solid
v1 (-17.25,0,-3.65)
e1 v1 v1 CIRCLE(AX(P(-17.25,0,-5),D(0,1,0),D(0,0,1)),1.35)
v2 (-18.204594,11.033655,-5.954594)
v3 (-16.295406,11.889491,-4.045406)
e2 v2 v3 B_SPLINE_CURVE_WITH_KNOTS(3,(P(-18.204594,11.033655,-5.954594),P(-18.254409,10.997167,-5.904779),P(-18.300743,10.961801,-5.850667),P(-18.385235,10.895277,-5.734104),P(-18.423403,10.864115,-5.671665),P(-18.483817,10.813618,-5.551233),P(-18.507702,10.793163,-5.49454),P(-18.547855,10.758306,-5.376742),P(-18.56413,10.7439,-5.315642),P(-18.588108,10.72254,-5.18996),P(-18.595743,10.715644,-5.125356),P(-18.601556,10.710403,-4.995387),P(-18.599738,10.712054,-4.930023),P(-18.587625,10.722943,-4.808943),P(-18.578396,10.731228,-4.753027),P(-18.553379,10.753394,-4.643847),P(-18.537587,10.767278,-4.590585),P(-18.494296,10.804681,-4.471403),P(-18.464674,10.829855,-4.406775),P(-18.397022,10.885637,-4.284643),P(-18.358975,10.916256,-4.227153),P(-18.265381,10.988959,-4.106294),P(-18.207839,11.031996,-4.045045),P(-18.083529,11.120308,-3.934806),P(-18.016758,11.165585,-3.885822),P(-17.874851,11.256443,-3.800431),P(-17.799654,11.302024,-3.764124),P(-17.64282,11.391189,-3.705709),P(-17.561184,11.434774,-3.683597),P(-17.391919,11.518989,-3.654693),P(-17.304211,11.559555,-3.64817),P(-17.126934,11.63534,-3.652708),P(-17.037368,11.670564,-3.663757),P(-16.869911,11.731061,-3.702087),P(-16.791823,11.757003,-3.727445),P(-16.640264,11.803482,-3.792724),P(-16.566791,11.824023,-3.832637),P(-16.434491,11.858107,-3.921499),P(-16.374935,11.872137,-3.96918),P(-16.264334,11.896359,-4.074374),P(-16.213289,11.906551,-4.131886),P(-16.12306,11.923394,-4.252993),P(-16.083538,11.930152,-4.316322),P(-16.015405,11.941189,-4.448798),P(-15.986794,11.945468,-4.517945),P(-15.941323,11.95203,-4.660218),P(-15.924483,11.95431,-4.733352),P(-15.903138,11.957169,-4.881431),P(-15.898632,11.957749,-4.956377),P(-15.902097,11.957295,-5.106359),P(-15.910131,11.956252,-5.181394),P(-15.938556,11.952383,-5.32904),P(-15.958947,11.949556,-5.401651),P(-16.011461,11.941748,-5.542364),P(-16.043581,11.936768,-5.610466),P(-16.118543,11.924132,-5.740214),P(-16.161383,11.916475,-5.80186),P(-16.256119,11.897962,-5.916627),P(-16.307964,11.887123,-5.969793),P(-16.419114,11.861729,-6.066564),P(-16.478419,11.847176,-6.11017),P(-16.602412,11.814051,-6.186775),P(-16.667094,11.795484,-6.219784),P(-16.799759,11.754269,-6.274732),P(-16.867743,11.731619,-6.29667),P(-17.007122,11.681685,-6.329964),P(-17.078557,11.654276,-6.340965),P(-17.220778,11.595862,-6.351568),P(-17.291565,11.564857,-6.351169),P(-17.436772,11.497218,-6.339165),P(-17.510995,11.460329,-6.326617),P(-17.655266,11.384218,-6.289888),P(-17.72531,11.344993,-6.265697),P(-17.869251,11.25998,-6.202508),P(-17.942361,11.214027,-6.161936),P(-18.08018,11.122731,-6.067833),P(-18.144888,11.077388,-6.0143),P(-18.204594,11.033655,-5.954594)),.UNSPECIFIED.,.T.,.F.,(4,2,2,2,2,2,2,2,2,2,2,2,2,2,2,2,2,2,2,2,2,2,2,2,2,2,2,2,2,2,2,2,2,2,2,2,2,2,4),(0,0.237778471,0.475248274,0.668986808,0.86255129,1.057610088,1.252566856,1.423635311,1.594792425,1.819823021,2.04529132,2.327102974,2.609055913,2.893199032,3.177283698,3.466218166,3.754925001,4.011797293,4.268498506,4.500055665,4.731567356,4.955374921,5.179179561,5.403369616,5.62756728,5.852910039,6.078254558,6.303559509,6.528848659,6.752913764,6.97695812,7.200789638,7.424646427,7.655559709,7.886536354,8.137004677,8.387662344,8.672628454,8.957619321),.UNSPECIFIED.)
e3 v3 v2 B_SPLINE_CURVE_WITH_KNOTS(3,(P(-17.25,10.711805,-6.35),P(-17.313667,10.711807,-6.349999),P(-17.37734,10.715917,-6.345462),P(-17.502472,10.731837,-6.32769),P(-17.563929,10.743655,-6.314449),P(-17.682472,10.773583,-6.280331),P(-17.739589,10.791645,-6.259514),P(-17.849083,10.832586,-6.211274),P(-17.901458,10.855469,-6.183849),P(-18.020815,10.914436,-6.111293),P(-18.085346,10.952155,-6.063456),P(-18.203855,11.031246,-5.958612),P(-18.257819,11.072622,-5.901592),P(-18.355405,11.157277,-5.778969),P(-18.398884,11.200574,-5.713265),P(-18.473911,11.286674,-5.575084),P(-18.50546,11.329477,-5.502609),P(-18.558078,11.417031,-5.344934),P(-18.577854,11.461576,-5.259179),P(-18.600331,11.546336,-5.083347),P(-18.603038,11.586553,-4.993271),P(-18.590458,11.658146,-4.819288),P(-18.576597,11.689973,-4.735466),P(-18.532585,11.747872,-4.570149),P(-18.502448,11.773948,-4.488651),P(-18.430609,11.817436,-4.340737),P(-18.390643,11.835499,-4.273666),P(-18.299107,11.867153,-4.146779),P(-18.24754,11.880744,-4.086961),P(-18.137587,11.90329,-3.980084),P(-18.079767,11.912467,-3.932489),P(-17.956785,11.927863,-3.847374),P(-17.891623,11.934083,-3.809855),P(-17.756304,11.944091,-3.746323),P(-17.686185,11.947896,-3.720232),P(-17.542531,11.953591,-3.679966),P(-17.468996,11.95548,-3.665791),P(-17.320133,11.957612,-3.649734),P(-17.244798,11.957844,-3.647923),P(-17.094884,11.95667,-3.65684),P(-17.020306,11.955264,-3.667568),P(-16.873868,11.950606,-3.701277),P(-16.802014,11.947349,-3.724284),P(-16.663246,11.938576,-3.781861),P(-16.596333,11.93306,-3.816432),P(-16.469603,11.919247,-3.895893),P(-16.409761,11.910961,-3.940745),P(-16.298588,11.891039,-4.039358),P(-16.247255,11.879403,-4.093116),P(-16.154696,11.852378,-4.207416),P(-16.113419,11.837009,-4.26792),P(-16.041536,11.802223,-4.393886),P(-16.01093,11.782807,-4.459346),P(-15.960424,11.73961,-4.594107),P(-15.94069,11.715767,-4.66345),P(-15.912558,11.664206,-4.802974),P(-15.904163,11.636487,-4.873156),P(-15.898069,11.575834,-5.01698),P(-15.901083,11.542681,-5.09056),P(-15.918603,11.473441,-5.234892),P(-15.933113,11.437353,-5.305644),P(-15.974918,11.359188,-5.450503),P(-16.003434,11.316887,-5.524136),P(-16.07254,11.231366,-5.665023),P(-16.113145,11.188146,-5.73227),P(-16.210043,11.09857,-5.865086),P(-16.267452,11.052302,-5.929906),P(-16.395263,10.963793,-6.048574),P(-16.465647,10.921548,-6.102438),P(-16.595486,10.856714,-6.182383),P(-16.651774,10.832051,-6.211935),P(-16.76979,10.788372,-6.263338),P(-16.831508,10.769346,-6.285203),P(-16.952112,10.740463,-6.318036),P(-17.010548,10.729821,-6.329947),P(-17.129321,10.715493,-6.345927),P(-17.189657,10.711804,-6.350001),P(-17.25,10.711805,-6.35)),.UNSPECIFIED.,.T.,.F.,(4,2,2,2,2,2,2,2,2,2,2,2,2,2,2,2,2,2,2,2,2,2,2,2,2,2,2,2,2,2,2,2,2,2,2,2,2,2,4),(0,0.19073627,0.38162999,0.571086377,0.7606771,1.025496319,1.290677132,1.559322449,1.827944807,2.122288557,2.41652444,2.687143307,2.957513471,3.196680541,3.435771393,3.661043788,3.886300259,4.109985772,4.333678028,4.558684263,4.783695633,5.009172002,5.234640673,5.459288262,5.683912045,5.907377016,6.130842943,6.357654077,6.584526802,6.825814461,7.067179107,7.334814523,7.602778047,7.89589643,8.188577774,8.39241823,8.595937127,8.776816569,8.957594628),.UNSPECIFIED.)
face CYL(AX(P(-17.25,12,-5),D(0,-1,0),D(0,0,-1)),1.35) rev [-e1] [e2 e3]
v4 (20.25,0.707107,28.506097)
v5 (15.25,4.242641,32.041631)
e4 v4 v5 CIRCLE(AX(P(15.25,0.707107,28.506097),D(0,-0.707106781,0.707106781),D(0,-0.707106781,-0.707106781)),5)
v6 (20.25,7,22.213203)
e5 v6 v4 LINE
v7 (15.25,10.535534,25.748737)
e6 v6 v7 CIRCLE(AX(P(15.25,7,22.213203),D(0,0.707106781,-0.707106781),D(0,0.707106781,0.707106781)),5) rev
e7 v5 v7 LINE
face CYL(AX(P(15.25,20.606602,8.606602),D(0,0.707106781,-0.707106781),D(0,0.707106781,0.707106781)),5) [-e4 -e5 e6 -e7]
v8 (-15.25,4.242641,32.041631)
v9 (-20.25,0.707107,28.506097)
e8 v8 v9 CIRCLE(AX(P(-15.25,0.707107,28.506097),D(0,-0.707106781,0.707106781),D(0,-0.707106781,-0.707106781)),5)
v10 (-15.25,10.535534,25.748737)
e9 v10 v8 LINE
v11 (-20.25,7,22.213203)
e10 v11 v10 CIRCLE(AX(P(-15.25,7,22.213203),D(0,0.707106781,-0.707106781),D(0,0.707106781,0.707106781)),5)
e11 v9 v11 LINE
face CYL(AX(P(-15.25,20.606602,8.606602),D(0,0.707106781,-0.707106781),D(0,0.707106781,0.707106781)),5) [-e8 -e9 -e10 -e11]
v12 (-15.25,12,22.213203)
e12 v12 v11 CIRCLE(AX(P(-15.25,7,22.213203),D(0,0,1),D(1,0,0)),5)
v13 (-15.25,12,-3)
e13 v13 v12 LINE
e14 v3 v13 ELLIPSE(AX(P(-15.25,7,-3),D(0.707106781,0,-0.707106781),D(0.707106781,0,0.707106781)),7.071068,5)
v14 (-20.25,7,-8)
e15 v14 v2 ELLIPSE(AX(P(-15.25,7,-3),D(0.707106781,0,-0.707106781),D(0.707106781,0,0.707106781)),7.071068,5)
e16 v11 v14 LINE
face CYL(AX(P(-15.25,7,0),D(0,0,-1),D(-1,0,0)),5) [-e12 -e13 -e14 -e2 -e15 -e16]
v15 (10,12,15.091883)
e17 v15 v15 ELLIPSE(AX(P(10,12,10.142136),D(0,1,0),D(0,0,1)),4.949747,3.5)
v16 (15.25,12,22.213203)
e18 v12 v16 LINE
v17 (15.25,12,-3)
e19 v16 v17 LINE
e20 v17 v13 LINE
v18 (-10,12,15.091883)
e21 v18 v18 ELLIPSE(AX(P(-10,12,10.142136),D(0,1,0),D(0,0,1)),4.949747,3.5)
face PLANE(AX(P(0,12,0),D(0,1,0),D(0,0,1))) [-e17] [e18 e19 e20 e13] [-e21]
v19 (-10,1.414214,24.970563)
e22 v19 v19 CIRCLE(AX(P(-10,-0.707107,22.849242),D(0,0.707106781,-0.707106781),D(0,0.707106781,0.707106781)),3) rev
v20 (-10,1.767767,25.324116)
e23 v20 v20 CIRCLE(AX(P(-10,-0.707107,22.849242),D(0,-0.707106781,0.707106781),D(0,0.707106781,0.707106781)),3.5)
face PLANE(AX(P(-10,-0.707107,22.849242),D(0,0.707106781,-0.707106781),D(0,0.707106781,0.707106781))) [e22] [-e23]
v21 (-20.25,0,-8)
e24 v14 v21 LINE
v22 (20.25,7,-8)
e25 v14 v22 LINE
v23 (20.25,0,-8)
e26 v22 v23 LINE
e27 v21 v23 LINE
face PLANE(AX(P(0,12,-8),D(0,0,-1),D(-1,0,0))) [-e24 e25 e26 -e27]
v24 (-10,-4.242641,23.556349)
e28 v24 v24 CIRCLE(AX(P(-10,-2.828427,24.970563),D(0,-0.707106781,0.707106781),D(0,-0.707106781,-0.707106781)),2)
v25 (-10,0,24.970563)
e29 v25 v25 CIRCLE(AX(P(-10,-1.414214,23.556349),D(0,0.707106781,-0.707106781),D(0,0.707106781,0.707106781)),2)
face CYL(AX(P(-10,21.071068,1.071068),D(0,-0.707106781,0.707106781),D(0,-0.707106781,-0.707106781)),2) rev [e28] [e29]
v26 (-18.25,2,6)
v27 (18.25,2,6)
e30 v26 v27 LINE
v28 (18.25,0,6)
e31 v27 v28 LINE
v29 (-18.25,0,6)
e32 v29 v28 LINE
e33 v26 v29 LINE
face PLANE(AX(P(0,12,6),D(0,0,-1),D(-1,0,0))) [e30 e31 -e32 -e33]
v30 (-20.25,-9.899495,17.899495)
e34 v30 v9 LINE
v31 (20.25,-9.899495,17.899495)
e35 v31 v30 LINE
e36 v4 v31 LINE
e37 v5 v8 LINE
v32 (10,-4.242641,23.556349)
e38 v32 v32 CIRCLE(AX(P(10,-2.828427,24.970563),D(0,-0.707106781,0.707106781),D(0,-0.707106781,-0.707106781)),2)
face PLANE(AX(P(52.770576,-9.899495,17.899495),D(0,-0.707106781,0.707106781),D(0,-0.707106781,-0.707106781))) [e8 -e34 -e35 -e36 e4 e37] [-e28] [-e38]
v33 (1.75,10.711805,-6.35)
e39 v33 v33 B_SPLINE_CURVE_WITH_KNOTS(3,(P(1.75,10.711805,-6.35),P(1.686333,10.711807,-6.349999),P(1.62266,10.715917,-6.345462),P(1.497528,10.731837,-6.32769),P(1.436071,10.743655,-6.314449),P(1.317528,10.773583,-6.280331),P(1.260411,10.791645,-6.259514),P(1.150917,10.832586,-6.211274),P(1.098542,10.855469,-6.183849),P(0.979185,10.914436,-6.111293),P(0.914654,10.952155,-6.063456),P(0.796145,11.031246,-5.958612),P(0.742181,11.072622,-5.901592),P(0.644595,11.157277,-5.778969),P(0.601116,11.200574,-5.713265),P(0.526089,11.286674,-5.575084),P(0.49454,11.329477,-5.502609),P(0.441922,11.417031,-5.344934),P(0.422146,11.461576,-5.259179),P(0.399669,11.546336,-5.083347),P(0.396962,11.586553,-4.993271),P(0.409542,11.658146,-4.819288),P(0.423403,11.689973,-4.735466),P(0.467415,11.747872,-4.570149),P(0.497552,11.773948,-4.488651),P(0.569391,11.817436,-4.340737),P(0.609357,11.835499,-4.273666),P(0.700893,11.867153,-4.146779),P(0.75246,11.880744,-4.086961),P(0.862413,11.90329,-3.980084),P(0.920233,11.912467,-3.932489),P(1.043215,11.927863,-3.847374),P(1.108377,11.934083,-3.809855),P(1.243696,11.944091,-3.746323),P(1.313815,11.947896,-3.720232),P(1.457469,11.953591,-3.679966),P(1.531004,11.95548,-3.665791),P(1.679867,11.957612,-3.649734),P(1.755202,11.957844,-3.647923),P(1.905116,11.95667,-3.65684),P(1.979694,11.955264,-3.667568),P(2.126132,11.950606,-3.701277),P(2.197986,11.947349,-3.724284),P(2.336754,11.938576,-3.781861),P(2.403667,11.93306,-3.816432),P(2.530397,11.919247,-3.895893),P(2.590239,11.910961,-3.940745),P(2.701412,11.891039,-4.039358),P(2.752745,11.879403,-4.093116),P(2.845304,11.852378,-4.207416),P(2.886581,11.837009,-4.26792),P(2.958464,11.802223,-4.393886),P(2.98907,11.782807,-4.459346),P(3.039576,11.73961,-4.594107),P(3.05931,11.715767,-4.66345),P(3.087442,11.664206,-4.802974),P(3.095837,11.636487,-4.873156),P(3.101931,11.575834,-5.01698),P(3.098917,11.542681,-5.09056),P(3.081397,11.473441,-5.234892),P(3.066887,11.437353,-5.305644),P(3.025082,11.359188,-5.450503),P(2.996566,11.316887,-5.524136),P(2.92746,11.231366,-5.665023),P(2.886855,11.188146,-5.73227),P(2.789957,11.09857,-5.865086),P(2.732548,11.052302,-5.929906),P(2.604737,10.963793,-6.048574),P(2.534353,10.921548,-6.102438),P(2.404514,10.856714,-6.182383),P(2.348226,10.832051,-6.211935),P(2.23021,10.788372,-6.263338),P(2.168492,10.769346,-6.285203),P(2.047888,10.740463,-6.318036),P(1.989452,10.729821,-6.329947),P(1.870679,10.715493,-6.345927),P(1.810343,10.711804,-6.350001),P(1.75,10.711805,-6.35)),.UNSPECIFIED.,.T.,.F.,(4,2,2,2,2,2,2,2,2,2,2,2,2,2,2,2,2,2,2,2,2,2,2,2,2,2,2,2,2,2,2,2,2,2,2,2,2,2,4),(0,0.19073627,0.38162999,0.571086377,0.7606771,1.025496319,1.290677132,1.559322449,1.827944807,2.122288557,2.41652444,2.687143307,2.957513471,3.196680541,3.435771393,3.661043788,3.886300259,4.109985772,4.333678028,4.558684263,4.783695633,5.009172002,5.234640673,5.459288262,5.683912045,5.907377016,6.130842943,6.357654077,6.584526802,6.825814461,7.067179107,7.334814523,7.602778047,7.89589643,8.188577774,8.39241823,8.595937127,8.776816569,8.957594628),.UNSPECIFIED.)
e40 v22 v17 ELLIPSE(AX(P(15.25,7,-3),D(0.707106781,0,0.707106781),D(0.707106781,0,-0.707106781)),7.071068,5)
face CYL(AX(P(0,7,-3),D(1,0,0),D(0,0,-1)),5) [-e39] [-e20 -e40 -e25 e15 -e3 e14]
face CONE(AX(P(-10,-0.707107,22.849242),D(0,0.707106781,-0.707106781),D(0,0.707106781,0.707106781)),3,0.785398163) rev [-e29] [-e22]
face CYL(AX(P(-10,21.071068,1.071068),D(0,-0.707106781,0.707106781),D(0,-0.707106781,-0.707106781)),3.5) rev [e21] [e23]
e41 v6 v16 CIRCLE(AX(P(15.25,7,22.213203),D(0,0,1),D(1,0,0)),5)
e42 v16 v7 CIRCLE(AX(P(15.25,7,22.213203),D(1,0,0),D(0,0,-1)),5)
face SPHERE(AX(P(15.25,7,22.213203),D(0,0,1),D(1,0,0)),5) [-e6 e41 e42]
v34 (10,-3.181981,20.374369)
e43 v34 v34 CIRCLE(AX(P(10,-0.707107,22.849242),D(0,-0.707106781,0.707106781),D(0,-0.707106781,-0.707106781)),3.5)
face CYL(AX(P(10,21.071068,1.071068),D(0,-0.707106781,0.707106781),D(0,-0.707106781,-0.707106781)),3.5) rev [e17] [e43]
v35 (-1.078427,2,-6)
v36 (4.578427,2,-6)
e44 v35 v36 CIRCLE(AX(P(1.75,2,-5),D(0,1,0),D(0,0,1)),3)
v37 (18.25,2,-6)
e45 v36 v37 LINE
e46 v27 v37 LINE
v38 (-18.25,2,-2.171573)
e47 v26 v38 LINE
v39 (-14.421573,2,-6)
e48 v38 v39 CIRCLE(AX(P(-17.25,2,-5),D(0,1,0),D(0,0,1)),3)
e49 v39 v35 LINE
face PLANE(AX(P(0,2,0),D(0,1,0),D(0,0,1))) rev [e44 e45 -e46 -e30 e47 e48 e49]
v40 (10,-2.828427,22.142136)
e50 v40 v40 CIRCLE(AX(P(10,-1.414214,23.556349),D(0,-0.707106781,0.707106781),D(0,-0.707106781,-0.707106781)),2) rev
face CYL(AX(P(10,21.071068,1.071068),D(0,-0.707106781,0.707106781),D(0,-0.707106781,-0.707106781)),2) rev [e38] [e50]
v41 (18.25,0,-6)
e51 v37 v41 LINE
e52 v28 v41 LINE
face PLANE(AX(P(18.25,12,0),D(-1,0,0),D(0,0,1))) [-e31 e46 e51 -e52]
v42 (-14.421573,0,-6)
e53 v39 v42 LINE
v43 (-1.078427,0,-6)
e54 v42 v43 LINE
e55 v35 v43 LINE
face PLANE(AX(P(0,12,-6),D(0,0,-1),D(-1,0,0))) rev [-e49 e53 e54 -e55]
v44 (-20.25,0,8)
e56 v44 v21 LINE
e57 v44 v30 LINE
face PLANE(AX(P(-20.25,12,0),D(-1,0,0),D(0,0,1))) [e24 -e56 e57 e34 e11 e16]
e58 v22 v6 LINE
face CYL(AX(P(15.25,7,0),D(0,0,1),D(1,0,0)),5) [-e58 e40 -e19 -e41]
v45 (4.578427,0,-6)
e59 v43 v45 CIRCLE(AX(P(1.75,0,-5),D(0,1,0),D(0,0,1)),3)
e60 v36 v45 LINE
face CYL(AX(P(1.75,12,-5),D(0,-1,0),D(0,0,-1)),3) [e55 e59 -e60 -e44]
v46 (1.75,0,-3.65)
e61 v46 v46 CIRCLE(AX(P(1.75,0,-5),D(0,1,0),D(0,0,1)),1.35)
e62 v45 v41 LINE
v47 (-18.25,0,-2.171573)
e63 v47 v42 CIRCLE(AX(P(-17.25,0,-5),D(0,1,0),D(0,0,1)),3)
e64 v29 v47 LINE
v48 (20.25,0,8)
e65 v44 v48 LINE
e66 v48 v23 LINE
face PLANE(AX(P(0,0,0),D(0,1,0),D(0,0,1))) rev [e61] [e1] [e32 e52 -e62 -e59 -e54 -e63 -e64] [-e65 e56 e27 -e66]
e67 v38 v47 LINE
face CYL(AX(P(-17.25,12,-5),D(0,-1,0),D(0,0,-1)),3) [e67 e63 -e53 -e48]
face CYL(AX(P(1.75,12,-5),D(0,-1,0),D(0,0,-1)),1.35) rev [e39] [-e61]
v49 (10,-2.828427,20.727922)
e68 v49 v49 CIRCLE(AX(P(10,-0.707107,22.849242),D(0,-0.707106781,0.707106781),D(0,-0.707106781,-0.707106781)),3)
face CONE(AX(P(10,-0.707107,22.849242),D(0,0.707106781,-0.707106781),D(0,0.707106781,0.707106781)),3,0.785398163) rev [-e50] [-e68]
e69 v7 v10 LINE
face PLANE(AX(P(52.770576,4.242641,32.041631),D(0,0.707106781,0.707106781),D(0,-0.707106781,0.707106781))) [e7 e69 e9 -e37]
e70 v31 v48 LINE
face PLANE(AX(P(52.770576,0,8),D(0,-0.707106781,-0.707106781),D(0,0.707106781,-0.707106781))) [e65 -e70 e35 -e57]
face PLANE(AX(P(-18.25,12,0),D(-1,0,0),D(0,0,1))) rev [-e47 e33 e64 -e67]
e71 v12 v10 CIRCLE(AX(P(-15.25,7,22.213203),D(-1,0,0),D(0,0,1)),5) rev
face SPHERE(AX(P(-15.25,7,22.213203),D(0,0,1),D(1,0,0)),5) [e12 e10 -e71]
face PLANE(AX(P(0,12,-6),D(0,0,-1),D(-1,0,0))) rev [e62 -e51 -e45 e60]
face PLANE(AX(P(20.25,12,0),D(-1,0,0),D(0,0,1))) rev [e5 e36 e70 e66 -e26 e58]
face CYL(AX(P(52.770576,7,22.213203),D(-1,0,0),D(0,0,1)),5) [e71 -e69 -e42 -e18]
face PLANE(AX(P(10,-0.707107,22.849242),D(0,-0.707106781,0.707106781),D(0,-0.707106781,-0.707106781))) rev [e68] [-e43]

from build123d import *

# Parameters (mm, degrees)
SKETCH1_W           = 40.5
SKETCH1_H           = 16
SKETCH1_R           = 1.35
BOSS_EXTRUDE1_DEPTH = 12
BOSS_EXTRUDE2_START = 2
BOSS_EXTRUDE2_DEPTH = 10
BOSS_EXTRUDE3_DEPTH = 40.5
SKETCH4_R           = 2
CUT_EXTRUDE3_DEPTH  = 40.502331785
CUT_EXTRUDE4_START  = -3
SKETCH4_5_R         = 3.5
SKETCH4_5_R_2       = 2
CUT_EXTRUDE4_DEPTH  = 37.502331785
CHAMFER2_SIZE       = 1
FILLET2_R           = 5


with BuildPart() as part:
    # Sketch1 → Boss-Extrude1 (new body)
    with BuildSketch(Plane(origin=(0, 0, 0), x_dir=(1, 0, 0), z_dir=(0, 1, 0))):
        Rectangle(SKETCH1_W, SKETCH1_H)
        with Locations(Location((-17.25, 5, 0), (0, 0, 270))):
            Circle(SKETCH1_R, mode=Mode.SUBTRACT)
        with BuildLine():
            Line((-14.421572875, 6), (-1.078427125, 6))
            ThreePointArc((-1.078427125, 6), (1.75, 2), (4.578427125, 6))
            Line((4.578427125, 6), (18.25, 6))
            Line((18.25, 6), (18.25, -6))
            Line((18.25, -6), (-18.25, -6))
            Line((-18.25, -6), (-18.25, 2.171572875))
            ThreePointArc((-18.25, 2.171572875), (-15.128679656, 2.878679656), (-14.421572875, 6))
        make_face(mode=Mode.SUBTRACT)
        with Locations(Location((1.75, 5, 0), (0, 0, 270))):
            Circle(SKETCH1_R, mode=Mode.SUBTRACT)
    extrude(amount=BOSS_EXTRUDE1_DEPTH)

    # Sketch1<3> → Boss-Extrude2 (add)
    with BuildSketch(Plane(origin=(0, 0, 0), x_dir=(1, 0, 0), z_dir=(0, 1, 0)).offset(BOSS_EXTRUDE2_START)):
        with BuildLine():
            ThreePointArc((-14.25, 5), (-15.517949192, 2.550510257), (-18.25, 2.171572875))
            Line((-18.25, 2.171572875), (-18.25, -6))
            Line((-18.25, -6), (18.25, -6))
            Line((18.25, -6), (18.25, 6))
            Line((18.25, 6), (4.578427125, 6))
            ThreePointArc((4.578427125, 6), (4.706795679, 5.507305936), (4.75, 5))
            ThreePointArc((4.75, 5), (1.242694064, 2.043204321), (-1.078427125, 6))
            Line((-1.078427125, 6), (-14.421572875, 6))
            ThreePointArc((-14.421572875, 6), (-14.293204321, 5.507305936), (-14.25, 5))
        make_face()
    extrude(amount=BOSS_EXTRUDE2_DEPTH)

    # Sketch3 → Boss-Extrude3 (add)
    with BuildSketch(Plane.ZY.offset(20.25)):
        Polygon((8, 0), (17.899494937, -9.899494937), (32.04163056, 4.242640687), (24.284271247, 12), (8, 12), align=None)
    extrude(amount=-BOSS_EXTRUDE3_DEPTH)

    # Sketch4 → Cut-Extrude3 (cut, through all)
    with BuildSketch(Plane(origin=(0, -13.899494937, 13.899494937), x_dir=(1, 0, 0), z_dir=(0, -0.7071067811865437, 0.7071067811865513))):
        with Locations(Location((-10, 15.656854249, 0), (0, 0, 270))):
            Circle(SKETCH4_R)
        with Locations(Location((10, 15.656854249, 0), (0, 0, 270))):
            Circle(SKETCH4_R)
    extrude(amount=-CUT_EXTRUDE3_DEPTH, mode=Mode.SUBTRACT)

    # Sketch4<5> → Cut-Extrude4 (cut, through all)
    # profile 1 of 2: a face of its own
    with BuildSketch(Plane(origin=(0, -13.899494937, 13.899494937), x_dir=(1, 0, 0), z_dir=(0, -0.7071067811865437, 0.7071067811865513)).offset(CUT_EXTRUDE4_START)):
        with Locations(Location((10, 15.656854249, 0), (0, 0, 270))):
            Circle(SKETCH4_5_R)
        with Locations(Location((10, 15.656854249, 0), (0, 0, 270))):
            Circle(SKETCH4_5_R_2, mode=Mode.SUBTRACT)
    # profile 2 of 2: a face of its own
    with BuildSketch(Plane(origin=(0, -13.899494937, 13.899494937), x_dir=(1, 0, 0), z_dir=(0, -0.7071067811865437, 0.7071067811865513)).offset(CUT_EXTRUDE4_START)):
        with Locations(Location((-10, 15.656854249, 0), (0, 0, 90))):
            Circle(SKETCH4_5_R)
        with Locations(Location((-10, 15.656854249, 0), (0, 0, 270))):
            Circle(SKETCH4_5_R_2, mode=Mode.SUBTRACT)
    extrude(amount=-CUT_EXTRUDE4_DEPTH, mode=Mode.SUBTRACT)

    # Chamfer2
    chamfer2_edges = [part.edges().sort_by_distance(p)[0] for p in [
        (-10, 0.707106781, 24.263455967),
        (10, 0.707106781, 24.263455967),
    ]]
    chamfer(chamfer2_edges, length=CHAMFER2_SIZE)

    # Fillet2
    # the kernel refuses this fillet: 5 mm, written as the material it takes off along each edge
    with BuildSketch(Plane(origin=(15.25, 7, 22.213203436), x_dir=(0, 0.7071067811865516, 0.7071067811865435), z_dir=(1, 0, 0))) as fillet2_piece_1_section:
        Polygon((0, 0), (FILLET2_R, 0), (FILLET2_R, -FILLET2_R * 0.414213562373), (FILLET2_R * 0.707106781187, -FILLET2_R * 0.707106781187), align=None)
    fillet2_piece_1 = extrude(amount=FILLET2_R, mode=Mode.PRIVATE)
    fillet2_piece_1 = fillet2_piece_1 - Plane(origin=(15.25, 7, 22.213203436), x_dir=(0, -0.9238795325112877, -0.3826834323650871), z_dir=(1, 0, 0)) * Sphere(FILLET2_R, mode=Mode.PRIVATE)
    add(fillet2_piece_1, mode=Mode.SUBTRACT)
    with BuildSketch(Plane(origin=(-15.25, 7, 22.213203436), x_dir=(0, 0.7071067811865516, 0.7071067811865435), z_dir=(-1, 0, 0))) as fillet2_piece_2_section:
        Polygon((0, 0), (FILLET2_R, 0), (FILLET2_R, FILLET2_R * 0.414213562373), (FILLET2_R * 0.707106781187, FILLET2_R * 0.707106781187), align=None)
    fillet2_piece_2 = extrude(amount=FILLET2_R, mode=Mode.PRIVATE)
    fillet2_piece_2 = fillet2_piece_2 - Plane(origin=(-15.25, 7, 22.213203436), x_dir=(0, -0.9238795325112877, -0.3826834323650871), z_dir=(-1, 0, 0)) * Sphere(FILLET2_R, mode=Mode.PRIVATE)
    add(fillet2_piece_2, mode=Mode.SUBTRACT)
    with BuildSketch(Plane(origin=(20.25, -4.596194078, 40.880465325), x_dir=(0, -0.7071067811865516, -0.7071067811865435), z_dir=(0, 0.7071067811865435, -0.7071067811865516))) as fillet2_piece_3:
        with BuildLine():
            CenterArc((FILLET2_R, FILLET2_R), FILLET2_R, 180, 90)
            Line((0, FILLET2_R), (0, 0))
            Line((0, 0), (FILLET2_R, 0))
        make_face()
    extrude(amount=21.399494937, mode=Mode.SUBTRACT)
    with BuildSketch(Plane(origin=(-20.25, -4.596194078, 40.880465325), x_dir=(0, -0.7071067811865516, -0.7071067811865435), z_dir=(0, 0.7071067811865435, -0.7071067811865516))) as fillet2_piece_4:
        with BuildLine():
            CenterArc((FILLET2_R, -FILLET2_R), FILLET2_R, 90, 90)
            Line((0, -FILLET2_R), (0, 0))
            Line((0, 0), (FILLET2_R, 0))
        make_face()
    extrude(amount=21.399494937, mode=Mode.SUBTRACT)
    with BuildSketch(Plane(origin=(20.25, 12, -20.5), x_dir=(0, -1, 0), z_dir=(0, 0, 1)), Plane(origin=(-20.25, 12, 22.213203436), x_dir=(0, -1, 0), z_dir=(0, 0, -1))) as fillet2_piece_5:
        with BuildLine():
            CenterArc((FILLET2_R, -FILLET2_R), FILLET2_R, 90, 90)
            Line((0, -FILLET2_R), (0, 0))
            Line((0, 0), (FILLET2_R, 0))
        make_face()
    extrude(amount=42.713203436, mode=Mode.SUBTRACT)
    with BuildSketch(Plane(origin=(-15.25, 12, 24.284271247), x_dir=(0, -0.7071067811865432, 0.7071067811865519), z_dir=(1, 0, 0))) as fillet2_piece_6:
        with BuildLine():
            CenterArc((FILLET2_R * 0.414213562373, FILLET2_R), FILLET2_R, 225, 45)
            Line((-FILLET2_R * 0.292893218813, FILLET2_R * 0.292893218813), (0, 0))
            Line((0, 0), (FILLET2_R * 0.414213562373, 0))
        make_face()
    extrude(amount=30.5, mode=Mode.SUBTRACT)
    with BuildSketch(Plane(origin=(32.75, 12, -8), x_dir=(0, -1, 0), z_dir=(-1, 0, 0))) as fillet2_piece_7:
        with BuildLine():
            CenterArc((FILLET2_R, FILLET2_R), FILLET2_R, 180, 90)
            Line((0, FILLET2_R), (0, 0))
            Line((0, 0), (FILLET2_R, 0))
        make_face()
    extrude(amount=65.5, mode=Mode.SUBTRACT)


solid = part.part
